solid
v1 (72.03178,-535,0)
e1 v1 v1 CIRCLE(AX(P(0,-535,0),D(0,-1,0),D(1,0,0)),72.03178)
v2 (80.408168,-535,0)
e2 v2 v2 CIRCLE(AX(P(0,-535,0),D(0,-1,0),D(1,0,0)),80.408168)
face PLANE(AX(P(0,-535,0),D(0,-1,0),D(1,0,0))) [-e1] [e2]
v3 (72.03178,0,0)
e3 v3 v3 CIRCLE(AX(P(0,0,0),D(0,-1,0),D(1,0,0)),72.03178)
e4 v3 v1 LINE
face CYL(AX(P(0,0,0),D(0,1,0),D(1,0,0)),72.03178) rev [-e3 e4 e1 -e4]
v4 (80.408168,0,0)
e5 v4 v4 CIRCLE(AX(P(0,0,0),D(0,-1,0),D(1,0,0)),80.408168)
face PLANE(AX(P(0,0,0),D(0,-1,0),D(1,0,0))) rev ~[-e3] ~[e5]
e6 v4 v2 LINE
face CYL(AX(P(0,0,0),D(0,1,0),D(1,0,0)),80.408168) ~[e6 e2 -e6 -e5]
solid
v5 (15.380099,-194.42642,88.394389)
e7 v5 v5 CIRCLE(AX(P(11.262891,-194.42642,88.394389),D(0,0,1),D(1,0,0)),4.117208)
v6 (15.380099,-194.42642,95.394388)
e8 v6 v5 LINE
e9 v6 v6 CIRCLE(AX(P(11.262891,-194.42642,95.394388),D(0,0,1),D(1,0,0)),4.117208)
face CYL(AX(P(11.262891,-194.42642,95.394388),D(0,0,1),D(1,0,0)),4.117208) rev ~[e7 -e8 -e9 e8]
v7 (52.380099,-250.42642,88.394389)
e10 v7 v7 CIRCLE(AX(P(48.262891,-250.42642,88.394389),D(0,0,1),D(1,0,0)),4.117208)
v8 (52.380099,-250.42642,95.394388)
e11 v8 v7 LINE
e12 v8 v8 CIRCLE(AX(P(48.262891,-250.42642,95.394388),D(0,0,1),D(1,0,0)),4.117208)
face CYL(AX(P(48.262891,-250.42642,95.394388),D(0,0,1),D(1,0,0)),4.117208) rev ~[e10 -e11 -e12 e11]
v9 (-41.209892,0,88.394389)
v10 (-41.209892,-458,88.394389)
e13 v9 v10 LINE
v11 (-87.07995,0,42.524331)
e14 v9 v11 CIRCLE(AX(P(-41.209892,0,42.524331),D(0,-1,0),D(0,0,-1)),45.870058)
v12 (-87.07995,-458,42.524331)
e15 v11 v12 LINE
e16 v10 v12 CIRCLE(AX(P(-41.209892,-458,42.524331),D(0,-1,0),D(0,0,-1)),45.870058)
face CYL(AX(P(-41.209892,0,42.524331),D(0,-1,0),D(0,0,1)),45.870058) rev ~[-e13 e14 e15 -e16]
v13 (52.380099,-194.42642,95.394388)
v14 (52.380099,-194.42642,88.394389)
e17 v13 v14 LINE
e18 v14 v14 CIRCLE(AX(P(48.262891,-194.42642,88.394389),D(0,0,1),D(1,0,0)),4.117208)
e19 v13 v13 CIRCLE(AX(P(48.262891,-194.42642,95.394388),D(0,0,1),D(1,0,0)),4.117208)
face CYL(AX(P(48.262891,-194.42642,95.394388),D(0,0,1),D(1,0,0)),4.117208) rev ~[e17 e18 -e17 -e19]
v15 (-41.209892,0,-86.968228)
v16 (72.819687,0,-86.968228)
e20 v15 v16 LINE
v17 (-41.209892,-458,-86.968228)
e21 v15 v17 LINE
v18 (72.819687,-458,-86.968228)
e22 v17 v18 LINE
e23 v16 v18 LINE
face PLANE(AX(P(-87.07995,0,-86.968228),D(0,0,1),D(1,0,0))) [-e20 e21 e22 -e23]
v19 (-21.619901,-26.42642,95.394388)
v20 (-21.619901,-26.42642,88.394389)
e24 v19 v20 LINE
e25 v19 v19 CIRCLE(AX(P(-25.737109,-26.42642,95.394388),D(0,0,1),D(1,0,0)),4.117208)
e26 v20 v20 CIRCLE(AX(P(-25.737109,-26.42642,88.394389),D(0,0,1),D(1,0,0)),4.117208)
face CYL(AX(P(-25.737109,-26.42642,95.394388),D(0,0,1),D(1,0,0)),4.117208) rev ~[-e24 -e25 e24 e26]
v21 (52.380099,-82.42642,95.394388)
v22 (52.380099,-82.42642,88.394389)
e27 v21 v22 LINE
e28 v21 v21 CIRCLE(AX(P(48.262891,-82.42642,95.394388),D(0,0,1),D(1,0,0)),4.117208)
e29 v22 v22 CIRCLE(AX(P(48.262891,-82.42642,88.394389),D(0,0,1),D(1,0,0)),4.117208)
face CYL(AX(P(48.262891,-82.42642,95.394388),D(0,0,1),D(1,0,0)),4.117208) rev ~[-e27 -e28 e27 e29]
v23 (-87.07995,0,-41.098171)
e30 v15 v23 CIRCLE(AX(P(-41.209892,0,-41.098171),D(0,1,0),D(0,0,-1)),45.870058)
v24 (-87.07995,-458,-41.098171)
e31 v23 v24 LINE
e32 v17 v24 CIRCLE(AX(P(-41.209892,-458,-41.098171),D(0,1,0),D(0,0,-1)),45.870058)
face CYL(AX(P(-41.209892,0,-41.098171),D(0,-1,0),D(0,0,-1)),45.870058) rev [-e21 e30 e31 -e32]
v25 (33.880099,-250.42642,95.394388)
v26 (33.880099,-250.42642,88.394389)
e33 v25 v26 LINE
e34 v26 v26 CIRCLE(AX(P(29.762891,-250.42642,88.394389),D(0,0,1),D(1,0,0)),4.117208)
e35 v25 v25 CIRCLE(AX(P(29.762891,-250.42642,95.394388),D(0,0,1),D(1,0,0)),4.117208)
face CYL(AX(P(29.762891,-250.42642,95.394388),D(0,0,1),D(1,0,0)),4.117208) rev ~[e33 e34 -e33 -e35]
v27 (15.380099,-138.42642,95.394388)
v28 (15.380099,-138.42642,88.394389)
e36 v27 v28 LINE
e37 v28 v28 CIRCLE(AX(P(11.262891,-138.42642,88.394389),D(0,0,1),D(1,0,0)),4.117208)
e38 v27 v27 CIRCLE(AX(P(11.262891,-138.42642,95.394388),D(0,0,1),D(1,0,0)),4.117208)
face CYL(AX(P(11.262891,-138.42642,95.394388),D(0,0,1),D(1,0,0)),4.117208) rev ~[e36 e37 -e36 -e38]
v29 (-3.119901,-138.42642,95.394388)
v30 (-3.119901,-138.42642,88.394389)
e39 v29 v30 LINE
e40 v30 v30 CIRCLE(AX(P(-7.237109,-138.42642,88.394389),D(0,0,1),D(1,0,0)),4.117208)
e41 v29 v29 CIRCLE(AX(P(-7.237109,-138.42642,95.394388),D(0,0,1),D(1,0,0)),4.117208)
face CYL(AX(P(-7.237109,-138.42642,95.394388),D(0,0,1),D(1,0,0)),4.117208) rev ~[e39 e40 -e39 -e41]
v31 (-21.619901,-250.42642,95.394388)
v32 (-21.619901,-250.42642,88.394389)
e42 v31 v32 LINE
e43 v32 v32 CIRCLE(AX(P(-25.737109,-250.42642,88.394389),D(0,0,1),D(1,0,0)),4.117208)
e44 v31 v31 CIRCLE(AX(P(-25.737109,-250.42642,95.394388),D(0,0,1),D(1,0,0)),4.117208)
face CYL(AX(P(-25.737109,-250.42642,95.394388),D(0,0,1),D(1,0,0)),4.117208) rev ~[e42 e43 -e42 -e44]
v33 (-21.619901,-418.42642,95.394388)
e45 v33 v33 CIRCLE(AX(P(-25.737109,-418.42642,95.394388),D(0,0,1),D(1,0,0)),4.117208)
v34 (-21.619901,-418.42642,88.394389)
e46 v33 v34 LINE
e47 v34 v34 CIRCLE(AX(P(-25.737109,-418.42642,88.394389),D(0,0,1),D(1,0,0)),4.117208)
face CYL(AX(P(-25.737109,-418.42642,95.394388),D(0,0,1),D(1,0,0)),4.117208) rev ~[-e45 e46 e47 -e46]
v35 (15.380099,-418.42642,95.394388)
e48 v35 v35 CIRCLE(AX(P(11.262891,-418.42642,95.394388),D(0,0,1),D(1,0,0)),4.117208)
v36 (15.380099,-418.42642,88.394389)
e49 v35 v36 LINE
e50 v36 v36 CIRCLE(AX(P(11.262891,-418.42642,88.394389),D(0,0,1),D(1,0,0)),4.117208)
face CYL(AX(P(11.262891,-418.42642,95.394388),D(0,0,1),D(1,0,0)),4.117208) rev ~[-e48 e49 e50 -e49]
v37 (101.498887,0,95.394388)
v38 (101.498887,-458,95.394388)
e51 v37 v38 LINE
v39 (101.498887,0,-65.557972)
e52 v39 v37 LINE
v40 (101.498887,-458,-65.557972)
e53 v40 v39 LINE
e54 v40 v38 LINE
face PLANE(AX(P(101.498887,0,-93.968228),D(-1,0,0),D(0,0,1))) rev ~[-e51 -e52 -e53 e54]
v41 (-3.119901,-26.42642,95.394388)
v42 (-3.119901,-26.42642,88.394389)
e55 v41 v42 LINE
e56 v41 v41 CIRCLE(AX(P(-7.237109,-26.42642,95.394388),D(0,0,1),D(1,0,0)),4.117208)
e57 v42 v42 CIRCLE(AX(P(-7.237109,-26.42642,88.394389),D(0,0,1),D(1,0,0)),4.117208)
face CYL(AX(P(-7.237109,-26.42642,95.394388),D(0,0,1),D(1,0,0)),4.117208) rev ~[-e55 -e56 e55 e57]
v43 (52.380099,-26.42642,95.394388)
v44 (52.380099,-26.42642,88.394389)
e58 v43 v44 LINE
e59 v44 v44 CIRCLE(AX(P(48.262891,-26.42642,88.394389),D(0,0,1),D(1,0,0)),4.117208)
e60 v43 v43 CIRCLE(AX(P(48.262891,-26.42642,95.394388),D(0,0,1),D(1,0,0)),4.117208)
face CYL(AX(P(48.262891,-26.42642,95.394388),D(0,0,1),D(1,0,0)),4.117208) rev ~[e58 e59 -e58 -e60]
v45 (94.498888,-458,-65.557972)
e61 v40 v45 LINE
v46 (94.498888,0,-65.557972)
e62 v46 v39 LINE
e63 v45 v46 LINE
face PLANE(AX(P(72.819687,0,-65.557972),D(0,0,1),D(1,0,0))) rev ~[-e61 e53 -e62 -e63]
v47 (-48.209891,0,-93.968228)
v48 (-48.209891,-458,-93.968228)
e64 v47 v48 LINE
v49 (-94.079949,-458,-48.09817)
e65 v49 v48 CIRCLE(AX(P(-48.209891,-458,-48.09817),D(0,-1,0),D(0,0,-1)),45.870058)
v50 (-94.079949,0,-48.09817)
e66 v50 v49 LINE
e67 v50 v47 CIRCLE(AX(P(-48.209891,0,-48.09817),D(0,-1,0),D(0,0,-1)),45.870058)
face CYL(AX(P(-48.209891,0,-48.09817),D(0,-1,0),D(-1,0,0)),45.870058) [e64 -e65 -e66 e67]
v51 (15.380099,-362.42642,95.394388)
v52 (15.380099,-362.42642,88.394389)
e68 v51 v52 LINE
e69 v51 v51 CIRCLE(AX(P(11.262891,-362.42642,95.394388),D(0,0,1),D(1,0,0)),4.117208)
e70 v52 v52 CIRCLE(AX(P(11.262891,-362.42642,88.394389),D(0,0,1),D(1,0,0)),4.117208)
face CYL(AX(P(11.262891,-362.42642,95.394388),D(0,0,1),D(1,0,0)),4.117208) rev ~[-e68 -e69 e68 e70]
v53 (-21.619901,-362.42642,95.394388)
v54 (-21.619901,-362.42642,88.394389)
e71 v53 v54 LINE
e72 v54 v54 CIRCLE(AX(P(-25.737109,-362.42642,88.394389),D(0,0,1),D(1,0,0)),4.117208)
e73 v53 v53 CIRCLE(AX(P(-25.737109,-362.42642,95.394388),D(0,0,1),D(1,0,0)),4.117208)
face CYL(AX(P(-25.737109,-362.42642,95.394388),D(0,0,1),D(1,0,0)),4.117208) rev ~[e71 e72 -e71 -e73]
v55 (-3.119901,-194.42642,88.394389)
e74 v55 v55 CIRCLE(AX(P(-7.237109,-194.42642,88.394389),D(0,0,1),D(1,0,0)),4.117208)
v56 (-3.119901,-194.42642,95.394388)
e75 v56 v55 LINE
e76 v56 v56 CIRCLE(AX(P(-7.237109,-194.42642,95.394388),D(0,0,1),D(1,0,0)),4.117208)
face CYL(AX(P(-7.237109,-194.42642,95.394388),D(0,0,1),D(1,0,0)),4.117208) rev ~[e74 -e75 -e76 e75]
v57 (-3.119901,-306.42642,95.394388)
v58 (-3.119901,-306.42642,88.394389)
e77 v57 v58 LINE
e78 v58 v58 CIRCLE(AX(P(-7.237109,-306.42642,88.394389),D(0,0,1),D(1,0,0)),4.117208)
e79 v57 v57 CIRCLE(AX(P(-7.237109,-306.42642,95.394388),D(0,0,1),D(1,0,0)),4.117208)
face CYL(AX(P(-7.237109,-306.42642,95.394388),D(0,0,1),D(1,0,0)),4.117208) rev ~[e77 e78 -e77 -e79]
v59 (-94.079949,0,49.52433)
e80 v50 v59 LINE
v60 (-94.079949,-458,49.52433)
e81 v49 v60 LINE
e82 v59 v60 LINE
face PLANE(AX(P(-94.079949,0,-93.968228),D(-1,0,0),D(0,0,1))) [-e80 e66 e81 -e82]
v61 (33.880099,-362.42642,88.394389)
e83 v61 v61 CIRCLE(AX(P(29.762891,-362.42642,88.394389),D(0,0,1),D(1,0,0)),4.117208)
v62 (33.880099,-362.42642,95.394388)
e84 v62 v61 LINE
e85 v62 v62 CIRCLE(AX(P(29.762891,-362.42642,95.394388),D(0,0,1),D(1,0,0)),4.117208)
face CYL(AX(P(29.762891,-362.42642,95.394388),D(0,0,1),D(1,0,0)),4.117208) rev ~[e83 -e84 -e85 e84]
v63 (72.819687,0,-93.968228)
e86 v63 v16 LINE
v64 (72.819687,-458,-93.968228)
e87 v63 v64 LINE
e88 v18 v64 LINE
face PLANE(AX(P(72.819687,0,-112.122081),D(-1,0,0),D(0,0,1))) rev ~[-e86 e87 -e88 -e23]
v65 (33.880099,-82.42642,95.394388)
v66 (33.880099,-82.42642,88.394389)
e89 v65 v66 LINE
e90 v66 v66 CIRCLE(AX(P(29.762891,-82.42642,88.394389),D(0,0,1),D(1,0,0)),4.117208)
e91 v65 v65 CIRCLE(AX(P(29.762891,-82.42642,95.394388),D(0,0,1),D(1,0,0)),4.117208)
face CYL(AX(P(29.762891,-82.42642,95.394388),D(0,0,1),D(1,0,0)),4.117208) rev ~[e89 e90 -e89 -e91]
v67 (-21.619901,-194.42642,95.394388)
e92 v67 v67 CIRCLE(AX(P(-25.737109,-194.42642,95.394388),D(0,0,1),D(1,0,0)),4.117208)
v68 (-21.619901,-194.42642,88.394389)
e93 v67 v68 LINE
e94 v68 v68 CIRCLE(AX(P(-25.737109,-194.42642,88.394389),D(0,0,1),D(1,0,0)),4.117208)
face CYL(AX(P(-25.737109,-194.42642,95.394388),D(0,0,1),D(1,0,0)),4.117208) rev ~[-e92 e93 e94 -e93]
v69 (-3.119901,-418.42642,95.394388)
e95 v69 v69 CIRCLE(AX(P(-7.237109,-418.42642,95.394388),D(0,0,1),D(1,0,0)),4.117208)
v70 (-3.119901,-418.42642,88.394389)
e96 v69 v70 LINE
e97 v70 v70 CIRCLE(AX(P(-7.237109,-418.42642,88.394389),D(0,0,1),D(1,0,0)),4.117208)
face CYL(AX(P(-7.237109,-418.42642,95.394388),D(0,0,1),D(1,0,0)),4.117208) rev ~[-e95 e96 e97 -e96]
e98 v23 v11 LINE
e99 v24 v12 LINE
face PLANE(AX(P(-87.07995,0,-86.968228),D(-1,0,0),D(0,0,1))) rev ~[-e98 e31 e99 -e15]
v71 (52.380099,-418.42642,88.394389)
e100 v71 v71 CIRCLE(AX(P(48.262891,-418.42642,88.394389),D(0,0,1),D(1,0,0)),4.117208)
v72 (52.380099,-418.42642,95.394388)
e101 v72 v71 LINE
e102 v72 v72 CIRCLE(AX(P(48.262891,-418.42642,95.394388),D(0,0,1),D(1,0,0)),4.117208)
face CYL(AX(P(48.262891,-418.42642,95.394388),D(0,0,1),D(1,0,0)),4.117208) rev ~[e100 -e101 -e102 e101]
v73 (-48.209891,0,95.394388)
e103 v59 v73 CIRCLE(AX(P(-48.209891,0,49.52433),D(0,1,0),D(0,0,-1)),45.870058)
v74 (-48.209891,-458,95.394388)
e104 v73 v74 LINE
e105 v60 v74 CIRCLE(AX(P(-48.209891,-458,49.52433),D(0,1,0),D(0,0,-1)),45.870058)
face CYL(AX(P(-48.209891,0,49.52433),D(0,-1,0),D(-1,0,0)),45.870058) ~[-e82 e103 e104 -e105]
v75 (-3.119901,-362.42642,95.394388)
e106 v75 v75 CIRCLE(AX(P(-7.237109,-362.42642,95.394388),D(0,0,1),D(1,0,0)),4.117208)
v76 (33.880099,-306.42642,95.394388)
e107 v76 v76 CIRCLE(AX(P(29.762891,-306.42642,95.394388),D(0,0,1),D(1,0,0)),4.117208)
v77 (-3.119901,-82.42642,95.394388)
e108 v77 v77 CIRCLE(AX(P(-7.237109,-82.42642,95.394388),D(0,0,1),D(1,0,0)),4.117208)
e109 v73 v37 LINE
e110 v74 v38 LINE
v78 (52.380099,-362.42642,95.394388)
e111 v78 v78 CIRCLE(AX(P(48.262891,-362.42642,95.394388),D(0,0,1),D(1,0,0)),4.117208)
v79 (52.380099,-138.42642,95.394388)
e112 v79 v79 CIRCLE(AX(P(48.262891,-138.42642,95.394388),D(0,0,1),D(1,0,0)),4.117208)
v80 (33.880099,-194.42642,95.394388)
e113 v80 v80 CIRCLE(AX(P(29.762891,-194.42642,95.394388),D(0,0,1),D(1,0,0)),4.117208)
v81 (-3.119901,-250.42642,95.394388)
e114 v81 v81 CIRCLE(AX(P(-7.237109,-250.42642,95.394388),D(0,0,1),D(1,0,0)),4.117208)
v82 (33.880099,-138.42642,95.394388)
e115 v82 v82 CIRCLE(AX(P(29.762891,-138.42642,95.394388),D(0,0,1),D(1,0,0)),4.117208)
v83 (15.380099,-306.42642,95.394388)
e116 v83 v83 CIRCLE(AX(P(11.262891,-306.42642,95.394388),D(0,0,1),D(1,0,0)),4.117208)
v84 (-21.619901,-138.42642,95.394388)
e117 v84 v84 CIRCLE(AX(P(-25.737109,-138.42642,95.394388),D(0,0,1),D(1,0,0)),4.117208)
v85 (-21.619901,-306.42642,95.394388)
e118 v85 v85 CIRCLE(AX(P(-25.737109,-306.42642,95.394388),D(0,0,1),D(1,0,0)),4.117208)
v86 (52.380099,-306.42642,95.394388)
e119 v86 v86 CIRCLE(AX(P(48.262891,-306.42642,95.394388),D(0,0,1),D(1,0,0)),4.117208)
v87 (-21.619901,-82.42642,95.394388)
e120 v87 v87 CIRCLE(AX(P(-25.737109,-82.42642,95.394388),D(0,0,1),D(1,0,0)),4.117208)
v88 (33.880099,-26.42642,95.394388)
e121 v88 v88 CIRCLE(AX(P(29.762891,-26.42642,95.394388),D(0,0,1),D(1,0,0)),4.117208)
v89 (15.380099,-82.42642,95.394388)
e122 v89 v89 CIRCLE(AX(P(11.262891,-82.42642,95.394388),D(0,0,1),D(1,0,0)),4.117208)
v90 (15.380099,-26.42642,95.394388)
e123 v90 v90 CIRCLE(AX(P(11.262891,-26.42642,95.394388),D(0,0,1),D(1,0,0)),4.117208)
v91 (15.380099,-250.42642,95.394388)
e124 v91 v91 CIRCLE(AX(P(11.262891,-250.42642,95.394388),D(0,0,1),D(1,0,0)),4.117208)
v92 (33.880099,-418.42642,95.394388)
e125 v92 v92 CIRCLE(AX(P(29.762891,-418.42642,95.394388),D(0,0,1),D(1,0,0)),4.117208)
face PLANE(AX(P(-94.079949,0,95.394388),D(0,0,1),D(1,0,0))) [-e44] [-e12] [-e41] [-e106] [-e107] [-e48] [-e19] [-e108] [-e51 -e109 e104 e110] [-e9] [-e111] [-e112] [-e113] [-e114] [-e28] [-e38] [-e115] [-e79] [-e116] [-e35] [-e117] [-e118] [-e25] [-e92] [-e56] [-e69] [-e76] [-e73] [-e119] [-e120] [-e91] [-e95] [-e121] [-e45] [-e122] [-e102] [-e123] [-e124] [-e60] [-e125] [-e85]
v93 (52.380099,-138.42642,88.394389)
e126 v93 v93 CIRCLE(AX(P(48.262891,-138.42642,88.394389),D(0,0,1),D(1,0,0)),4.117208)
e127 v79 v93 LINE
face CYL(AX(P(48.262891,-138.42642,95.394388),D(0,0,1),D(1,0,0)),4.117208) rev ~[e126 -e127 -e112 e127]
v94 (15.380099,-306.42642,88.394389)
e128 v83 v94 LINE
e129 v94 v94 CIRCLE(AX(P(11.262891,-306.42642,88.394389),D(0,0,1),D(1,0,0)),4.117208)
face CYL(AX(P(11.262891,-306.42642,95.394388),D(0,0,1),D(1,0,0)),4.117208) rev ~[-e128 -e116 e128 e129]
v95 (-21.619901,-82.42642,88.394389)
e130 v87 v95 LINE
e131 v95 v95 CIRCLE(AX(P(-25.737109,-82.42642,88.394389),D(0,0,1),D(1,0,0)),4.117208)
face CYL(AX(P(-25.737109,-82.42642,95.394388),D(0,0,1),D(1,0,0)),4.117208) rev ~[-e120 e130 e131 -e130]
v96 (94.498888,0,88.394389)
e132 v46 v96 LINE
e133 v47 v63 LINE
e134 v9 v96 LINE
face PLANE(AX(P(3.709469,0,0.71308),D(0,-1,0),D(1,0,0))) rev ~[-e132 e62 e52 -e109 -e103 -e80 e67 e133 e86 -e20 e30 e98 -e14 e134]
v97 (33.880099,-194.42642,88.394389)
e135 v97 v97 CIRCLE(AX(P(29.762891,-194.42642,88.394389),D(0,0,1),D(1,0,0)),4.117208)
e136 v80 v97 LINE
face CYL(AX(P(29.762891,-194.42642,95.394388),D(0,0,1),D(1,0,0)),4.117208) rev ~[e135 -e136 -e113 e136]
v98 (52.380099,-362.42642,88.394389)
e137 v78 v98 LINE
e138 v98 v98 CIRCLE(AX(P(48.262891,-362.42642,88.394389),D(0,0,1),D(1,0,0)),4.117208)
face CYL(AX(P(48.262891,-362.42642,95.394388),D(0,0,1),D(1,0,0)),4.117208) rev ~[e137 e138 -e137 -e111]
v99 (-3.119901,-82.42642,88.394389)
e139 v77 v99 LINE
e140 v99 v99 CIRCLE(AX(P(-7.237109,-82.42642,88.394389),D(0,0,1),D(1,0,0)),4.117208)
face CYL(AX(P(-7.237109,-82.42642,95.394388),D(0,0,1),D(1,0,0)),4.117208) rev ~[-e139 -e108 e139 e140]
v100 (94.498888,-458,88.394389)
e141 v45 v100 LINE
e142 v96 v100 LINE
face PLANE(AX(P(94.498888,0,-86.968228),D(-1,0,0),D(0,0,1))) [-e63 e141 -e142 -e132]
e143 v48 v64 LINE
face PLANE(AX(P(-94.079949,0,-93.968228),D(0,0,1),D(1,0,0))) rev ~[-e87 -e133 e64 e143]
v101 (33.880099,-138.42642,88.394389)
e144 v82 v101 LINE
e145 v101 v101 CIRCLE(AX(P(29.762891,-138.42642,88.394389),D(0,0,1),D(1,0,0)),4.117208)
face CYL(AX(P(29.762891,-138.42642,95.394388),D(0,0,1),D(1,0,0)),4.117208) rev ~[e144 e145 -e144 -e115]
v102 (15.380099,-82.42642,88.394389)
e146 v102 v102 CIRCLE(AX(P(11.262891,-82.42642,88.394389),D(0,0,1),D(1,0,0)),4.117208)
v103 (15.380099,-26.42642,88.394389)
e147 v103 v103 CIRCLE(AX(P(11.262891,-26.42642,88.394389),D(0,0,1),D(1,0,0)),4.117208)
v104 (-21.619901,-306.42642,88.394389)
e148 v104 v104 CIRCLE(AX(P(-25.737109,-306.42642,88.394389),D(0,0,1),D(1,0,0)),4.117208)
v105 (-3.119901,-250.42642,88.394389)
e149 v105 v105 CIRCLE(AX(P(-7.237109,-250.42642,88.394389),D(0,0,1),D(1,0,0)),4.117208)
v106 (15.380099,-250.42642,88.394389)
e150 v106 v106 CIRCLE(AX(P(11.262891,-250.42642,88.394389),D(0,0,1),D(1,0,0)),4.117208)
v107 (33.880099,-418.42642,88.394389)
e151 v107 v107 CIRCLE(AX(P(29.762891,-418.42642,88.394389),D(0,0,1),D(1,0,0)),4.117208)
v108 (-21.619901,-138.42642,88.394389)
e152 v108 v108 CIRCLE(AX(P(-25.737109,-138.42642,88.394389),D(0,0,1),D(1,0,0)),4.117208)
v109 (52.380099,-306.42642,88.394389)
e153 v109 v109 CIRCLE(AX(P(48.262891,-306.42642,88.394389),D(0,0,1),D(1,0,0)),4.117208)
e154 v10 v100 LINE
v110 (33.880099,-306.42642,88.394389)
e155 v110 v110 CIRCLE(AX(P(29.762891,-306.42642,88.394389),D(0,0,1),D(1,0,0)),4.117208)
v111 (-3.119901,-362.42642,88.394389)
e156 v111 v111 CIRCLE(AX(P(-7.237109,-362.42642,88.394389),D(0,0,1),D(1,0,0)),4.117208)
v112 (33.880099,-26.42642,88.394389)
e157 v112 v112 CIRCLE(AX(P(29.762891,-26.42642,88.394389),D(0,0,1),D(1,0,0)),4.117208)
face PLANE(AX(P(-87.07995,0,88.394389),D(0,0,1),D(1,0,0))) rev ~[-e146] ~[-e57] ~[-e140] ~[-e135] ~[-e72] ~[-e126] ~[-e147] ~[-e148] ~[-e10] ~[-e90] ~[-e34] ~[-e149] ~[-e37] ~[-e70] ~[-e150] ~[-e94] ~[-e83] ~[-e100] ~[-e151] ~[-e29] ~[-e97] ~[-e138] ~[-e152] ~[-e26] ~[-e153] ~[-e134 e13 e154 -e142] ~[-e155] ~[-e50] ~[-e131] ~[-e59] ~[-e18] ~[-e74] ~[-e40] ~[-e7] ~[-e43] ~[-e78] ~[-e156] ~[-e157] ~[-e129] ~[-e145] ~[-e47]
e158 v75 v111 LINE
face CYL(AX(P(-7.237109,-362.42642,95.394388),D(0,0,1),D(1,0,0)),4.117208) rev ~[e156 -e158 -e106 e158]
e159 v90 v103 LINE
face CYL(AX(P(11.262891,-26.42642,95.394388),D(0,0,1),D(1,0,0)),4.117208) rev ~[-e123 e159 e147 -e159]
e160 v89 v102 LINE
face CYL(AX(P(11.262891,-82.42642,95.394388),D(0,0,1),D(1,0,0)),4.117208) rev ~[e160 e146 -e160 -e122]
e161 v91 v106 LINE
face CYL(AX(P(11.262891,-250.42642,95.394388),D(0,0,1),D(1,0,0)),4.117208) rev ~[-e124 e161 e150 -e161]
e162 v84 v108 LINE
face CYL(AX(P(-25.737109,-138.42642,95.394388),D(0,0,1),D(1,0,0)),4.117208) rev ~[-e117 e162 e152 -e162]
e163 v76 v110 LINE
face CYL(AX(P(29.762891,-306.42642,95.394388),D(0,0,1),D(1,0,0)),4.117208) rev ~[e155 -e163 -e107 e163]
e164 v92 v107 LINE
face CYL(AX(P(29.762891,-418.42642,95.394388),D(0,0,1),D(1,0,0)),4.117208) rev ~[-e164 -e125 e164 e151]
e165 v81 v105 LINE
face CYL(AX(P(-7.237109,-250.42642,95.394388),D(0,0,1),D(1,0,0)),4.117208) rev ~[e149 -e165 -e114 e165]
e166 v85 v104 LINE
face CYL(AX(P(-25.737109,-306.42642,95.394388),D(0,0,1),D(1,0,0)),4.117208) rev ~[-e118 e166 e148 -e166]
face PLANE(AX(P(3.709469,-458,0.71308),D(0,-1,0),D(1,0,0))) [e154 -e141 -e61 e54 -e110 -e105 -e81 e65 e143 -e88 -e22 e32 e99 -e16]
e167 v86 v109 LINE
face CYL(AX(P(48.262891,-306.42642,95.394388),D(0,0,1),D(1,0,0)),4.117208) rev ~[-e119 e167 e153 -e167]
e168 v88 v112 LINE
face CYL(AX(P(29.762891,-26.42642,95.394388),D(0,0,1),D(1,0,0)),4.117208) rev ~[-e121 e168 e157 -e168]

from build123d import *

# Parameters (mm, degrees)
F0_R     = 80.4081682795
F0_R_2   = 72.0317797119
F1_DEPTH = 535
F2_W     = 195.5788359046
F2_H     = 189.3626153469
F2_W_2   = 181.5788373351
F2_H_2   = 175.3626167774
F3_DEPTH = 458
F4_R     = 45.8700576851
F5_R     = 4.11720773
F6_DEPTH = 56
F7_W     = 21.679200232
F7_H     = 21.4102566242
F8_DEPTH = 939


with BuildPart() as f1:
    # F0 (on Front) → F1 (new body)
    with BuildSketch(Plane.XZ):
        Circle(F0_R)
        Circle(F0_R_2, mode=Mode.SUBTRACT)
    extrude(amount=F1_DEPTH)


with BuildPart() as f3:
    # F2 (on Front) → F3 (new body)
    with BuildSketch(Plane.XZ):
        with Locations((3.7094689906, 0.7130801678)):
            Rectangle(F2_W, F2_H)
        with Locations((3.7094689906, 0.7130801678)):
            Rectangle(F2_W_2, F2_H_2, mode=Mode.SUBTRACT)
    extrude(amount=F3_DEPTH)

    # F4
    f4_edges = [f3.edges().sort_by_distance(p)[0] for p in [
        (-87.07995, -229, 88.394389),
        (-94.079949, -229, 95.394388),
        (-87.07995, -229, -86.968228),
        (-94.079949, -229, -93.968228),
    ]]
    fillet(f4_edges, radius=F4_R)

    # F5 (on face) → F6 (cut)
    with BuildSketch(Plane.XY.offset(95.3943878412)):
        with Locations((-25.7371086627, -26.4264196157)):
            Circle(F5_R)
        with Locations((-25.7371086627, -82.4264196157)):
            Circle(F5_R)
        with Locations((-25.7371086627, -138.4264196157)):
            Circle(F5_R)
        with Locations((-25.7371086627, -194.4264196157)):
            Circle(F5_R)
        with Locations((-25.7371086627, -250.4264196157)):
            Circle(F5_R)
        with Locations((-25.7371086627, -306.4264196157)):
            Circle(F5_R)
        with Locations((-25.7371086627, -362.4264196157)):
            Circle(F5_R)
        with Locations((-25.7371086627, -418.4264196157)):
            Circle(F5_R)
        with Locations((-7.2371086627, -26.4264196157)):
            Circle(F5_R)
        with Locations((-7.2371086627, -82.4264196157)):
            Circle(F5_R)
        with Locations((-7.2371086627, -138.4264196157)):
            Circle(F5_R)
        with Locations((-7.2371086627, -194.4264196157)):
            Circle(F5_R)
        with Locations((-7.2371086627, -250.4264196157)):
            Circle(F5_R)
        with Locations((-7.2371086627, -306.4264196157)):
            Circle(F5_R)
        with Locations((-7.2371086627, -362.4264196157)):
            Circle(F5_R)
        with Locations((-7.2371086627, -418.4264196157)):
            Circle(F5_R)
        with Locations((11.2628913373, -26.4264196157)):
            Circle(F5_R)
        with Locations((11.2628913373, -82.4264196157)):
            Circle(F5_R)
        with Locations((11.2628913373, -138.4264196157)):
            Circle(F5_R)
        with Locations((11.2628913373, -194.4264196157)):
            Circle(F5_R)
        with Locations((11.2628913373, -250.4264196157)):
            Circle(F5_R)
        with Locations((11.2628913373, -306.4264196157)):
            Circle(F5_R)
        with Locations((11.2628913373, -362.4264196157)):
            Circle(F5_R)
        with Locations((11.2628913373, -418.4264196157)):
            Circle(F5_R)
        with Locations((29.7628913373, -26.4264196157)):
            Circle(F5_R)
        with Locations((29.7628913373, -82.4264196157)):
            Circle(F5_R)
        with Locations((29.7628913373, -138.4264196157)):
            Circle(F5_R)
        with Locations((29.7628913373, -194.4264196157)):
            Circle(F5_R)
        with Locations((29.7628913373, -250.4264196157)):
            Circle(F5_R)
        with Locations((29.7628913373, -306.4264196157)):
            Circle(F5_R)
        with Locations((29.7628913373, -362.4264196157)):
            Circle(F5_R)
        with Locations((29.7628913373, -418.4264196157)):
            Circle(F5_R)
        with Locations((48.2628913373, -26.4264196157)):
            Circle(F5_R)
        with Locations((48.2628913373, -82.4264196157)):
            Circle(F5_R)
        with Locations((48.2628913373, -138.4264196157)):
            Circle(F5_R)
        with Locations((48.2628913373, -194.4264196157)):
            Circle(F5_R)
        with Locations((48.2628913373, -250.4264196157)):
            Circle(F5_R)
        with Locations((48.2628913373, -306.4264196157)):
            Circle(F5_R)
        with Locations((48.2628913373, -362.4264196157)):
            Circle(F5_R)
        with Locations((48.2628913373, -418.4264196157)):
            Circle(F5_R)
    extrude(amount=-F6_DEPTH, mode=Mode.SUBTRACT)

    # F7 (on face) → F8 (cut)
    with BuildSketch(Plane(origin=(0, 0, 0), x_dir=(-1, 0, 0), z_dir=(0, 1, 0))):
        Polygon((-101.4988869429, -93.9682275057), (-72.8196874261, -93.9682275057), (-72.8196874261, -86.9682282209), (-94.4988876581, -86.9682282209), (-94.4988876581, -65.5579715967), (-101.4988869429, -65.5579715967), align=None)
        with Locations((-83.6592875421, -76.2630999088)):
            Rectangle(F7_W, F7_H)
        Polygon((-142.2729939222, -65.5579715967), (-142.2729939222, -112.1220812201), (-72.8196874261, -112.1220812201), (-72.8196874261, -93.9682275057), (-101.4988869429, -93.9682275057), (-101.4988869429, -65.5579715967), align=None)
    extrude(amount=-F8_DEPTH, mode=Mode.SUBTRACT)


solid = Compound([f1.part, f3.part])
